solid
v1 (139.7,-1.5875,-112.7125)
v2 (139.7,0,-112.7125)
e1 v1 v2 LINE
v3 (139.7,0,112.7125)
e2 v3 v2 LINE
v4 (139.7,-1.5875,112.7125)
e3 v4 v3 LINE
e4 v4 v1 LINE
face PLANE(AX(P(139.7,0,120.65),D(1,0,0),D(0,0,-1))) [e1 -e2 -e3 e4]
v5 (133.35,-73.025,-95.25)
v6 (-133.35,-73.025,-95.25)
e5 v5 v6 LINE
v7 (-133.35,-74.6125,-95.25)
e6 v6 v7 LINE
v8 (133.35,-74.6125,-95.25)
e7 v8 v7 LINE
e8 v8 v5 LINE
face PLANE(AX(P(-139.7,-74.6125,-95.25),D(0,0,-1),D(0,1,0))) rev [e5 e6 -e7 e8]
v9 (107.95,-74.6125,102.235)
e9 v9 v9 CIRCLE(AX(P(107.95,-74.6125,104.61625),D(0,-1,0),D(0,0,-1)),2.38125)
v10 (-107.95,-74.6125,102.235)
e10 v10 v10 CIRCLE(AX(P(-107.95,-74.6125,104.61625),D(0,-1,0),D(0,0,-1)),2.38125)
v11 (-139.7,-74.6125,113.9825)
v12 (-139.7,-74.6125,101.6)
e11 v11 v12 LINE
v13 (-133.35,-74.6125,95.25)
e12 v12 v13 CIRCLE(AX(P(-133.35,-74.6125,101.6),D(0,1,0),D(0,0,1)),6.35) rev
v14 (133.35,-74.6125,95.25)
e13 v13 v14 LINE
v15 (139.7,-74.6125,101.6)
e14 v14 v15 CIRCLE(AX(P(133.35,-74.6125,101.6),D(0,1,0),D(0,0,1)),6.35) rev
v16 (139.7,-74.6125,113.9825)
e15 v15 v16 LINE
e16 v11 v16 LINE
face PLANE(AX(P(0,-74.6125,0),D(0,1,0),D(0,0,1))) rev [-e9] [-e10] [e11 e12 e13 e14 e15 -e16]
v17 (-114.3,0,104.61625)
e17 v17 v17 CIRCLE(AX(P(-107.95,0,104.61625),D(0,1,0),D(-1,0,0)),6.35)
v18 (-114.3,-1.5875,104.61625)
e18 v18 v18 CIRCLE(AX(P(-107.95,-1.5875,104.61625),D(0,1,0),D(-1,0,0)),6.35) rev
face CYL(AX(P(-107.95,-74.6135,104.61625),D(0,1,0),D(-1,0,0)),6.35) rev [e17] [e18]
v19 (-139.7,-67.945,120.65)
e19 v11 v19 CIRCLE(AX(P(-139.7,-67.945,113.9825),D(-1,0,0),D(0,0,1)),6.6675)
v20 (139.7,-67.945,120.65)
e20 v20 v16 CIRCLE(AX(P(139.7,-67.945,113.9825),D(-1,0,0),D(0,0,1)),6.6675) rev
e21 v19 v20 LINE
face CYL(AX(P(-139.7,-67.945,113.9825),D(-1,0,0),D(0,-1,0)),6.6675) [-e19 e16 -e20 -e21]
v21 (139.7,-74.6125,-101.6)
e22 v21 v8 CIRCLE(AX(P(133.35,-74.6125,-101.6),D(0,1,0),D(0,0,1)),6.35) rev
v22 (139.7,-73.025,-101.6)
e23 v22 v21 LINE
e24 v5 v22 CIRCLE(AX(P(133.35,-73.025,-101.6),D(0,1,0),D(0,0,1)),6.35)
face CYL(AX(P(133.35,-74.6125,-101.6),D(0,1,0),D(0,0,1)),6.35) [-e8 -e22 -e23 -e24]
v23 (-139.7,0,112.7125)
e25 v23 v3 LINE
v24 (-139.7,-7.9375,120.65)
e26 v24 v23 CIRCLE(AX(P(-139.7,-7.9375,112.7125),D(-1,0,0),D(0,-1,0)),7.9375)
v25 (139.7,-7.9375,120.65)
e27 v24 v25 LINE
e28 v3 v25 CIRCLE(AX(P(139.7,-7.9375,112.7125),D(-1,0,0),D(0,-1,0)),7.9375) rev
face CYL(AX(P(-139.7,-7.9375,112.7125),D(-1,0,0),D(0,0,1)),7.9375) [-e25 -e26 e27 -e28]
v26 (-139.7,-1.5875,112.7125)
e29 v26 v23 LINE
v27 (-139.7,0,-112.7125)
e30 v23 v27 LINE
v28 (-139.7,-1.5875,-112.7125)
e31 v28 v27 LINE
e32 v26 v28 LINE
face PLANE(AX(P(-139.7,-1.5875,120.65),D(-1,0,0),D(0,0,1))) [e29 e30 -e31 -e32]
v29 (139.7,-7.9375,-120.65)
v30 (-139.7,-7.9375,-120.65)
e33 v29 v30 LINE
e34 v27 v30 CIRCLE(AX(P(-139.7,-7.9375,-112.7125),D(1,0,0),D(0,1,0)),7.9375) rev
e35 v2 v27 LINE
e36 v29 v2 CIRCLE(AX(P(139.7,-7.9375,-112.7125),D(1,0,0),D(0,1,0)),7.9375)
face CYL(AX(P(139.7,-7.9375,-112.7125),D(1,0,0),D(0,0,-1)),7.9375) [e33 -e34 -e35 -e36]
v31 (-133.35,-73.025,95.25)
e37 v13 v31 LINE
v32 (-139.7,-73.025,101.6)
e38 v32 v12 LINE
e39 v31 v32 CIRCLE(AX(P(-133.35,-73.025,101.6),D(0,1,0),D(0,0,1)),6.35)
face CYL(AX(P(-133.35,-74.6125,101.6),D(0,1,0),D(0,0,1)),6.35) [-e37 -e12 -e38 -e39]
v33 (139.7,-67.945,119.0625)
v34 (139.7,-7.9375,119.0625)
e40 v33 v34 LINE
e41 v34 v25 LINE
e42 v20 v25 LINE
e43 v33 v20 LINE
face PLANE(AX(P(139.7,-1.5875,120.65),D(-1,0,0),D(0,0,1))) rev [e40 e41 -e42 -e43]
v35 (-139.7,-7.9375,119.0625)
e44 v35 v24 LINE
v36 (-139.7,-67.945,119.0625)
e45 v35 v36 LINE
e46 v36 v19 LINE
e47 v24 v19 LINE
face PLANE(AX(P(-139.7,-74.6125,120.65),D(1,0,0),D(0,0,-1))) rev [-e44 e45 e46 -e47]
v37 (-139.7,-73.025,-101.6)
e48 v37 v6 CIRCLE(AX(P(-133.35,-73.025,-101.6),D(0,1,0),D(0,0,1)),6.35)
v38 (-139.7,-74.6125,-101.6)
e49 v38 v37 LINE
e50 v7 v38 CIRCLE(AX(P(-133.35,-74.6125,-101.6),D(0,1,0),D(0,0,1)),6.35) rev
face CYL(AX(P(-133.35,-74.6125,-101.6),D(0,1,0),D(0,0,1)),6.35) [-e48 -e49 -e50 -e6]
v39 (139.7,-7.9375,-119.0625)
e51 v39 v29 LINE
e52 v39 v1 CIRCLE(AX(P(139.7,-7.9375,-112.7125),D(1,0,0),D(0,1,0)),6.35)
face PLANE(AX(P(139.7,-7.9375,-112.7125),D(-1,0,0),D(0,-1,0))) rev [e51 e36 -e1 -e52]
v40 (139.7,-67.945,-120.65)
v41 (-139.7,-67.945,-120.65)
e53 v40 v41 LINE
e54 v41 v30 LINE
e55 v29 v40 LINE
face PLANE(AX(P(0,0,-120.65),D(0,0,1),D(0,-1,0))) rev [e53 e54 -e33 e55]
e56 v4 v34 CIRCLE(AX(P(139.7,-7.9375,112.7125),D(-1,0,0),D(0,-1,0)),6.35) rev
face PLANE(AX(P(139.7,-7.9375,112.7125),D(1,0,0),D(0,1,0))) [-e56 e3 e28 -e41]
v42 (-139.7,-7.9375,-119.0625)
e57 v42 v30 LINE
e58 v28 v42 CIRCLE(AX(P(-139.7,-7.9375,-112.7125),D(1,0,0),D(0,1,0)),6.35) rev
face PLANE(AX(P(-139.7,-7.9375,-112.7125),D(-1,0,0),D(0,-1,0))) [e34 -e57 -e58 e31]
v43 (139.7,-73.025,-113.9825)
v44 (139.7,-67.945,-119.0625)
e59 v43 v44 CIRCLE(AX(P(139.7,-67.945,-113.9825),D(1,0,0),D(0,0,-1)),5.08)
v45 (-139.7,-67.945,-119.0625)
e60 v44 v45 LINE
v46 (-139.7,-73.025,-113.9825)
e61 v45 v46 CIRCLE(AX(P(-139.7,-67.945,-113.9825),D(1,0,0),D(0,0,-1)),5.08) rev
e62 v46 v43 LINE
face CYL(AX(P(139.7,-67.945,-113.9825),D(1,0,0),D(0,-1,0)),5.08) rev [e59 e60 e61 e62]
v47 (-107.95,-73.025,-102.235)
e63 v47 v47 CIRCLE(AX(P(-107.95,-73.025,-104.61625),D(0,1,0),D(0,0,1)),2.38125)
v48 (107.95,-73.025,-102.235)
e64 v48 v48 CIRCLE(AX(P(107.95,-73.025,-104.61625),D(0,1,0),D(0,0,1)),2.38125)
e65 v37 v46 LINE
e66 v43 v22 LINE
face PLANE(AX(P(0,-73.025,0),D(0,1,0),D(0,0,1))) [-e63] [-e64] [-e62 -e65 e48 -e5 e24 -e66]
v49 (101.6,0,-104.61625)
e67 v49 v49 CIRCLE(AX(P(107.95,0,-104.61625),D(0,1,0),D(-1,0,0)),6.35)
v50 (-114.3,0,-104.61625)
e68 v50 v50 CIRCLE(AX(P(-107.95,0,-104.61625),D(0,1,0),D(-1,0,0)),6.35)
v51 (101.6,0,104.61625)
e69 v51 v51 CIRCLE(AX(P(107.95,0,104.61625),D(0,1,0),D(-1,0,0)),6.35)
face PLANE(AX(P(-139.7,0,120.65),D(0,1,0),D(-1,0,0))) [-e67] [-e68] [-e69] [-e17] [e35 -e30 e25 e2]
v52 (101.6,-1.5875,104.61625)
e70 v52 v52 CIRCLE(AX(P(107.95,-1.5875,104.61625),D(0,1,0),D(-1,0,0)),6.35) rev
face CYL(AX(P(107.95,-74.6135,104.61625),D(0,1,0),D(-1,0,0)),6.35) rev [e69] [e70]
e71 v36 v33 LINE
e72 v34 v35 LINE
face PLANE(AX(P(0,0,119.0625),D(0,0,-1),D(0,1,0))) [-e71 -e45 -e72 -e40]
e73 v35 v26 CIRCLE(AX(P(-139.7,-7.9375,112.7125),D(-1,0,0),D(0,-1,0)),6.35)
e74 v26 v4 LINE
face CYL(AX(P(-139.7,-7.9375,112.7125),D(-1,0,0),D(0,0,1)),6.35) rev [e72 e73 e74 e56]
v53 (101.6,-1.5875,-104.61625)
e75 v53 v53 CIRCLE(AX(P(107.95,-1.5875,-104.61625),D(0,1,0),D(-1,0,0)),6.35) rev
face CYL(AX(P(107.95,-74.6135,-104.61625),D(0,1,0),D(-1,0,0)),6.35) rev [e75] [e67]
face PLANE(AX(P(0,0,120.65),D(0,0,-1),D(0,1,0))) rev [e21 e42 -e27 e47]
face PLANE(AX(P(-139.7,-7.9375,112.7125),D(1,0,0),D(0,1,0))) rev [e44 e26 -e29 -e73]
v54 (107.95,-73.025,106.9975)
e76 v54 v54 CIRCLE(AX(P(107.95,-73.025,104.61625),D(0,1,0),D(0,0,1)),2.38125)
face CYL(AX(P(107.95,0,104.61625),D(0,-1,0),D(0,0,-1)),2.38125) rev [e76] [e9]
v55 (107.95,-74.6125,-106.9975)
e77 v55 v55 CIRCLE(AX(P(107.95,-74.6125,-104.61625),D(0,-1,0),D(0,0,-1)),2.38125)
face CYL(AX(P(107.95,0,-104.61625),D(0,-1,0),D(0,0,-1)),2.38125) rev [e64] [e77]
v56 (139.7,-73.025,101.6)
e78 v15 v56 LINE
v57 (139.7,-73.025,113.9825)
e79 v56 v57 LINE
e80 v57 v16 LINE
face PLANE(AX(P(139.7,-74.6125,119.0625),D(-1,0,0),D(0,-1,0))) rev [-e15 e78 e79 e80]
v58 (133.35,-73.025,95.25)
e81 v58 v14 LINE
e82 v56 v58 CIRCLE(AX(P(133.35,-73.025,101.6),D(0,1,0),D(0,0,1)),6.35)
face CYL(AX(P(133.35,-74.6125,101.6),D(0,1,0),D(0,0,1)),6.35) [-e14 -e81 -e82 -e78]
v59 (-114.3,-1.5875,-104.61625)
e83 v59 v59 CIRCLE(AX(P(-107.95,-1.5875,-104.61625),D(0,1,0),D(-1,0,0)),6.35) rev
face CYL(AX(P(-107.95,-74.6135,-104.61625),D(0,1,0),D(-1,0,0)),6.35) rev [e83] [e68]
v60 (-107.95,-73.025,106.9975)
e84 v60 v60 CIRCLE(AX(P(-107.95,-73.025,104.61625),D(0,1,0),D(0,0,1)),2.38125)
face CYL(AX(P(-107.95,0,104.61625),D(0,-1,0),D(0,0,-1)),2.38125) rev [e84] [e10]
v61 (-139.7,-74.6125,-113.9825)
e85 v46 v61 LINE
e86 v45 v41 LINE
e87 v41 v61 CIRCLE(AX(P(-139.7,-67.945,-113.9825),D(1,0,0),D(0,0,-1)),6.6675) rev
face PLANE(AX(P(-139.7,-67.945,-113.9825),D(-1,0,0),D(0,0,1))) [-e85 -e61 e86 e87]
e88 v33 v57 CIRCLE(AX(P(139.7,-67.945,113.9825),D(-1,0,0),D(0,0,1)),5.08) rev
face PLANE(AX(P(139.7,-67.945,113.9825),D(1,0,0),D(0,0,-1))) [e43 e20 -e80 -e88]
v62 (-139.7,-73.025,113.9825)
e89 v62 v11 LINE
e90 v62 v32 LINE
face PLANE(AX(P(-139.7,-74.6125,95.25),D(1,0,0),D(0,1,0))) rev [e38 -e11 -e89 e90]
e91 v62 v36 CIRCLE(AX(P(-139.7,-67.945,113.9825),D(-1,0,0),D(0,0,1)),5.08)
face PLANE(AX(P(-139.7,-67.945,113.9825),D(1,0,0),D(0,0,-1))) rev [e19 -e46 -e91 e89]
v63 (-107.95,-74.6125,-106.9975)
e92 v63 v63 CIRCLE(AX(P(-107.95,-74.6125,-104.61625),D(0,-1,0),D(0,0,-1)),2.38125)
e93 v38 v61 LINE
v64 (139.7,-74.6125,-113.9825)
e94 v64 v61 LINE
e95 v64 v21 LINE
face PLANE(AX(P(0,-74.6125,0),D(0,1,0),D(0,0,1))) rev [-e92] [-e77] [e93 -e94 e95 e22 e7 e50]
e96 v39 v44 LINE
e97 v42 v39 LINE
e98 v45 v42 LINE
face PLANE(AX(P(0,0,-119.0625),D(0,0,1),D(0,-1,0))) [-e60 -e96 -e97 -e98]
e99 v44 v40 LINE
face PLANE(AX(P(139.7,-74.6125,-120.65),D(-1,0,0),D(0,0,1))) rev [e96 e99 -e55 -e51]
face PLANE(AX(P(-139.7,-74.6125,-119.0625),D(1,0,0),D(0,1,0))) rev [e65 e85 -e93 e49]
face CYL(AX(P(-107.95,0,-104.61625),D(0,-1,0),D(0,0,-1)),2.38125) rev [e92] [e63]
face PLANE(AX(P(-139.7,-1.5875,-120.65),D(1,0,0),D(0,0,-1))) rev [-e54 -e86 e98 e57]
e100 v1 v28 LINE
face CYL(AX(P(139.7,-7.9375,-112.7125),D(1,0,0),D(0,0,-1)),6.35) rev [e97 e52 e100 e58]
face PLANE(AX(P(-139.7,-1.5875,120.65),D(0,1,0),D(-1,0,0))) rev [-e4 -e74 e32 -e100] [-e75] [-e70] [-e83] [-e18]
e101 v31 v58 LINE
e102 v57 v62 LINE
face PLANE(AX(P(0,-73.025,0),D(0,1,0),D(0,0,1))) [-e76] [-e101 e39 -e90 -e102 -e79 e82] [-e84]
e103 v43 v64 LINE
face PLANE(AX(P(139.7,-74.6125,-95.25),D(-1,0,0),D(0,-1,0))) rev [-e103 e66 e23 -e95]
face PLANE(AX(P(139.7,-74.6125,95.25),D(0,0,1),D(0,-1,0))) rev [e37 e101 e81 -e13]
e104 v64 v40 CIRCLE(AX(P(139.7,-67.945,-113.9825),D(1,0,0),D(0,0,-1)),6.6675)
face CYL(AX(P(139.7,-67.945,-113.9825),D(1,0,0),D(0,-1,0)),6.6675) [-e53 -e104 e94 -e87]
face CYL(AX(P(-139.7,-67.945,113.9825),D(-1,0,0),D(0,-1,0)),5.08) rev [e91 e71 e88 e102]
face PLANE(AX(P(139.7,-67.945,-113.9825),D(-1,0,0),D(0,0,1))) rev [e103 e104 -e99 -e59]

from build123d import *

# Parameters (mm, degrees)
BASE_FLANGE1_DEPTH             = 120.65
BASE_FLANGE1_DEPTH_BACK        = 120.65
SKETCH2_W                      = 279.4
SKETCH2_H                      = 1.5875
EDGE_FLANGE1_STRIP_W           = 19.05
EDGE_FLANGE1_STRIP_H           = 1.5875
EDGE_FLANGE1_STRIP_CUT_DEPTH   = 279.4
EDGE_FLANGE1_STRIP_2_W         = 19.05
EDGE_FLANGE1_STRIP_2_H         = 1.5875
EDGE_FLANGE1_STRIP_CUT_2_DEPTH = 279.4
EDGE_FLANGE1_DEPTH             = 279.4
EDGE_FLANGE1_BEND_DEPTH        = 279.4
EDGE_FLANGE2_STRIP_W           = 16.51
EDGE_FLANGE2_STRIP_H           = 1.5875
EDGE_FLANGE2_STRIP_CUT_DEPTH   = 279.4
EDGE_FLANGE2_STRIP_2_W         = 16.51
EDGE_FLANGE2_STRIP_2_H         = 1.5875
EDGE_FLANGE2_STRIP_CUT_2_DEPTH = 279.4
EDGE_FLANGE2_DEPTH             = 279.4
EDGE_FLANGE2_BEND_DEPTH        = 279.4
FILLET1_R                      = 6.35
SKETCH18_R                     = 2.38125
CUT_EXTRUDE1_DEPTH             = 200.096804736
CUT_EXTRUDE2_REACH             = 201.097
SKETCH19_R                     = 6.35


# Sheet-metal steps are written as plain solids
with BuildPart() as part:
    # Sketch2 → Base-Flange1 (new, two sides: drawn at the far end of the back side and taken through both)
    with BuildSketch(Plane.XY.offset(-BASE_FLANGE1_DEPTH_BACK)):
        with Locations((0, -0.79375)):
            Rectangle(SKETCH2_W, SKETCH2_H)
    extrude(amount=BASE_FLANGE1_DEPTH + BASE_FLANGE1_DEPTH_BACK)

    # Edge-Flange1 strip (across the edge) → Edge-Flange1 strip cut (cut)
    with BuildSketch(Plane(origin=(139.7, -1.5875, 120.65), x_dir=(0, 0, -1), z_dir=(-1, 0, 0))):
        with Locations((-1.5875, -0.79375)):
            Rectangle(EDGE_FLANGE1_STRIP_W, EDGE_FLANGE1_STRIP_H)
    extrude(amount=EDGE_FLANGE1_STRIP_CUT_DEPTH, mode=Mode.SUBTRACT)

    # Edge-Flange1 strip 2 (across the edge) → Edge-Flange1 strip cut 2 (cut)
    with BuildSketch(Plane(origin=(-139.7, -1.5875, -120.65), x_dir=(0, 0, 1), z_dir=(1, 0, 0))):
        with Locations((-1.5875, -0.79375)):
            Rectangle(EDGE_FLANGE1_STRIP_2_W, EDGE_FLANGE1_STRIP_2_H)
    extrude(amount=EDGE_FLANGE1_STRIP_CUT_2_DEPTH, mode=Mode.SUBTRACT)

    # Edge-Flange1 section (across the edge) → Edge-Flange1 (add)
    with BuildSketch(Plane(origin=(139.7, -1.5875, 120.65), x_dir=(0, 0, -1), z_dir=(-1, 0, 0))):
        with BuildLine():
            Line((0, 6.35), (0, 73.025))
            Line((0, 73.025), (1.5875, 73.025))
            Line((1.5875, 73.025), (1.5875, 6.35))
            ThreePointArc((1.5875, 6.35), (3.447371939, 1.859871939), (7.9375, 0))
            Line((7.9375, 0), (7.9375, -1.5875))
            ThreePointArc((7.9375, -1.5875), (2.324839924, 0.737339924), (0, 6.35))
        make_face()
    extrude(amount=EDGE_FLANGE1_DEPTH)

    # Edge-Flange1 section 2 (across the edge) → Edge-Flange1 bend (add)
    with BuildSketch(Plane(origin=(-139.7, -1.5875, -120.65), x_dir=(0, 0, 1), z_dir=(1, 0, 0))):
        with BuildLine():
            Line((0, 6.35), (0, 73.025))
            Line((0, 73.025), (1.5875, 73.025))
            Line((1.5875, 73.025), (1.5875, 6.35))
            ThreePointArc((1.5875, 6.35), (3.447371939, 1.859871939), (7.9375, 0))
            Line((7.9375, 0), (7.9375, -1.5875))
            ThreePointArc((7.9375, -1.5875), (2.324839924, 0.737339924), (0, 6.35))
        make_face()
    extrude(amount=EDGE_FLANGE1_BEND_DEPTH)

    # Edge-Flange2 strip (across the edge) → Edge-Flange2 strip cut (cut)
    with BuildSketch(Plane(origin=(139.7, -74.6125, 119.0625), x_dir=(0, 1, 0), z_dir=(-1, 0, 0))):
        with Locations((-1.5875, -0.79375)):
            Rectangle(EDGE_FLANGE2_STRIP_W, EDGE_FLANGE2_STRIP_H)
    extrude(amount=EDGE_FLANGE2_STRIP_CUT_DEPTH, mode=Mode.SUBTRACT)

    # Edge-Flange2 strip 2 (across the edge) → Edge-Flange2 strip cut 2 (cut)
    with BuildSketch(Plane(origin=(-139.7, -74.6125, -119.0625), x_dir=(0, 1, 0), z_dir=(1, 0, 0))):
        with Locations((-1.5875, -0.79375)):
            Rectangle(EDGE_FLANGE2_STRIP_2_W, EDGE_FLANGE2_STRIP_2_H)
    extrude(amount=EDGE_FLANGE2_STRIP_CUT_2_DEPTH, mode=Mode.SUBTRACT)

    # Edge-Flange2 section (across the edge) → Edge-Flange2 (add)
    with BuildSketch(Plane(origin=(139.7, -74.6125, 119.0625), x_dir=(0, 1, 0), z_dir=(-1, 0, 0))):
        with BuildLine():
            Line((0, 5.08), (0, 23.8125))
            Line((0, 23.8125), (1.5875, 23.8125))
            Line((1.5875, 23.8125), (1.5875, 5.08))
            ThreePointArc((1.5875, 5.08), (3.075397552, 1.487897552), (6.6675, 0))
            Line((6.6675, 0), (6.6675, -1.5875))
            ThreePointArc((6.6675, -1.5875), (1.952865536, 0.365365536), (0, 5.08))
        make_face()
    extrude(amount=EDGE_FLANGE2_DEPTH)

    # Edge-Flange2 section 2 (across the edge) → Edge-Flange2 bend (add)
    with BuildSketch(Plane(origin=(-139.7, -74.6125, -119.0625), x_dir=(0, 1, 0), z_dir=(1, 0, 0))):
        with BuildLine():
            Line((0, 5.08), (0, 23.8125))
            Line((0, 23.8125), (1.5875, 23.8125))
            Line((1.5875, 23.8125), (1.5875, 5.08))
            ThreePointArc((1.5875, 5.08), (3.075397552, 1.487897552), (6.6675, 0))
            Line((6.6675, 0), (6.6675, -1.5875))
            ThreePointArc((6.6675, -1.5875), (1.952865536, 0.365365536), (0, 5.08))
        make_face()
    extrude(amount=EDGE_FLANGE2_BEND_DEPTH)

    # Fillet1
    fillet1_edges = [part.edges().sort_by_distance(p)[0] for p in [
        (139.7, -73.81875, 95.25),
        (-139.7, -73.81875, 95.25),
        (-139.7, -73.81875, -95.25),
        (139.7, -73.81875, -95.25),
    ]]
    fillet(fillet1_edges, radius=FILLET1_R)

    # Sketch18 → Cut-Extrude1 (cut, through all)
    with BuildSketch(Plane.XZ.offset(74.6125)):
        with Locations(Location((-107.95, 104.61625, 0), (0, 0, 270))):
            Circle(SKETCH18_R)
        with Locations(Location((-107.95, -104.61625, 0), (0, 0, 270))):
            Circle(SKETCH18_R)
        with Locations(Location((107.95, -104.61625, 0), (0, 0, 270))):
            Circle(SKETCH18_R)
        with Locations(Location((107.95, 104.61625, 0), (0, 0, 270))):
            Circle(SKETCH18_R)
    extrude(amount=-CUT_EXTRUDE1_DEPTH, mode=Mode.SUBTRACT)

    # Sketch19 → Cut-Extrude2 (cut, up to next)
    with BuildSketch(Plane(origin=(0, 0, 0), x_dir=(1, 0, 0), z_dir=(0, 1, 0)), mode=Mode.PRIVATE) as cut_extrude2_sk1:
        with Locations(Location((-107.95, -104.61625, 0), (0, 0, 180))):
            Circle(SKETCH19_R)
    cut_extrude2_tool1 = extrude(cut_extrude2_sk1.sketch, amount=-CUT_EXTRUDE2_REACH, mode=Mode.PRIVATE) & part.part
    # Sketch19 → Cut-Extrude2 (cut, up to next)
    with BuildSketch(Plane(origin=(0, 0, 0), x_dir=(1, 0, 0), z_dir=(0, 1, 0)), mode=Mode.PRIVATE) as cut_extrude2_sk2:
        with Locations(Location((107.95, -104.61625, 0), (0, 0, 180))):
            Circle(SKETCH19_R)
    cut_extrude2_tool2 = extrude(cut_extrude2_sk2.sketch, amount=-CUT_EXTRUDE2_REACH, mode=Mode.PRIVATE) & part.part
    # Sketch19 → Cut-Extrude2 (cut, up to next)
    with BuildSketch(Plane(origin=(0, 0, 0), x_dir=(1, 0, 0), z_dir=(0, 1, 0)), mode=Mode.PRIVATE) as cut_extrude2_sk3:
        with Locations(Location((107.95, 104.61625, 0), (0, 0, 180))):
            Circle(SKETCH19_R)
    cut_extrude2_tool3 = extrude(cut_extrude2_sk3.sketch, amount=-CUT_EXTRUDE2_REACH, mode=Mode.PRIVATE) & part.part
    # Sketch19 → Cut-Extrude2 (cut, up to next)
    with BuildSketch(Plane(origin=(0, 0, 0), x_dir=(1, 0, 0), z_dir=(0, 1, 0)), mode=Mode.PRIVATE) as cut_extrude2_sk4:
        with Locations(Location((-107.95, 104.61625, 0), (0, 0, 180))):
            Circle(SKETCH19_R)
    cut_extrude2_tool4 = extrude(cut_extrude2_sk4.sketch, amount=-CUT_EXTRUDE2_REACH, mode=Mode.PRIVATE) & part.part
    add(cut_extrude2_tool1.solids().sort_by_distance((-107.95, 0, 104.61625))[0], mode=Mode.SUBTRACT)
    add(cut_extrude2_tool2.solids().sort_by_distance((107.95, 0, 104.61625))[0], mode=Mode.SUBTRACT)
    add(cut_extrude2_tool3.solids().sort_by_distance((107.95, 0, -104.61625))[0], mode=Mode.SUBTRACT)
    add(cut_extrude2_tool4.solids().sort_by_distance((-107.95, 0, -104.61625))[0], mode=Mode.SUBTRACT)


solid = part.part
